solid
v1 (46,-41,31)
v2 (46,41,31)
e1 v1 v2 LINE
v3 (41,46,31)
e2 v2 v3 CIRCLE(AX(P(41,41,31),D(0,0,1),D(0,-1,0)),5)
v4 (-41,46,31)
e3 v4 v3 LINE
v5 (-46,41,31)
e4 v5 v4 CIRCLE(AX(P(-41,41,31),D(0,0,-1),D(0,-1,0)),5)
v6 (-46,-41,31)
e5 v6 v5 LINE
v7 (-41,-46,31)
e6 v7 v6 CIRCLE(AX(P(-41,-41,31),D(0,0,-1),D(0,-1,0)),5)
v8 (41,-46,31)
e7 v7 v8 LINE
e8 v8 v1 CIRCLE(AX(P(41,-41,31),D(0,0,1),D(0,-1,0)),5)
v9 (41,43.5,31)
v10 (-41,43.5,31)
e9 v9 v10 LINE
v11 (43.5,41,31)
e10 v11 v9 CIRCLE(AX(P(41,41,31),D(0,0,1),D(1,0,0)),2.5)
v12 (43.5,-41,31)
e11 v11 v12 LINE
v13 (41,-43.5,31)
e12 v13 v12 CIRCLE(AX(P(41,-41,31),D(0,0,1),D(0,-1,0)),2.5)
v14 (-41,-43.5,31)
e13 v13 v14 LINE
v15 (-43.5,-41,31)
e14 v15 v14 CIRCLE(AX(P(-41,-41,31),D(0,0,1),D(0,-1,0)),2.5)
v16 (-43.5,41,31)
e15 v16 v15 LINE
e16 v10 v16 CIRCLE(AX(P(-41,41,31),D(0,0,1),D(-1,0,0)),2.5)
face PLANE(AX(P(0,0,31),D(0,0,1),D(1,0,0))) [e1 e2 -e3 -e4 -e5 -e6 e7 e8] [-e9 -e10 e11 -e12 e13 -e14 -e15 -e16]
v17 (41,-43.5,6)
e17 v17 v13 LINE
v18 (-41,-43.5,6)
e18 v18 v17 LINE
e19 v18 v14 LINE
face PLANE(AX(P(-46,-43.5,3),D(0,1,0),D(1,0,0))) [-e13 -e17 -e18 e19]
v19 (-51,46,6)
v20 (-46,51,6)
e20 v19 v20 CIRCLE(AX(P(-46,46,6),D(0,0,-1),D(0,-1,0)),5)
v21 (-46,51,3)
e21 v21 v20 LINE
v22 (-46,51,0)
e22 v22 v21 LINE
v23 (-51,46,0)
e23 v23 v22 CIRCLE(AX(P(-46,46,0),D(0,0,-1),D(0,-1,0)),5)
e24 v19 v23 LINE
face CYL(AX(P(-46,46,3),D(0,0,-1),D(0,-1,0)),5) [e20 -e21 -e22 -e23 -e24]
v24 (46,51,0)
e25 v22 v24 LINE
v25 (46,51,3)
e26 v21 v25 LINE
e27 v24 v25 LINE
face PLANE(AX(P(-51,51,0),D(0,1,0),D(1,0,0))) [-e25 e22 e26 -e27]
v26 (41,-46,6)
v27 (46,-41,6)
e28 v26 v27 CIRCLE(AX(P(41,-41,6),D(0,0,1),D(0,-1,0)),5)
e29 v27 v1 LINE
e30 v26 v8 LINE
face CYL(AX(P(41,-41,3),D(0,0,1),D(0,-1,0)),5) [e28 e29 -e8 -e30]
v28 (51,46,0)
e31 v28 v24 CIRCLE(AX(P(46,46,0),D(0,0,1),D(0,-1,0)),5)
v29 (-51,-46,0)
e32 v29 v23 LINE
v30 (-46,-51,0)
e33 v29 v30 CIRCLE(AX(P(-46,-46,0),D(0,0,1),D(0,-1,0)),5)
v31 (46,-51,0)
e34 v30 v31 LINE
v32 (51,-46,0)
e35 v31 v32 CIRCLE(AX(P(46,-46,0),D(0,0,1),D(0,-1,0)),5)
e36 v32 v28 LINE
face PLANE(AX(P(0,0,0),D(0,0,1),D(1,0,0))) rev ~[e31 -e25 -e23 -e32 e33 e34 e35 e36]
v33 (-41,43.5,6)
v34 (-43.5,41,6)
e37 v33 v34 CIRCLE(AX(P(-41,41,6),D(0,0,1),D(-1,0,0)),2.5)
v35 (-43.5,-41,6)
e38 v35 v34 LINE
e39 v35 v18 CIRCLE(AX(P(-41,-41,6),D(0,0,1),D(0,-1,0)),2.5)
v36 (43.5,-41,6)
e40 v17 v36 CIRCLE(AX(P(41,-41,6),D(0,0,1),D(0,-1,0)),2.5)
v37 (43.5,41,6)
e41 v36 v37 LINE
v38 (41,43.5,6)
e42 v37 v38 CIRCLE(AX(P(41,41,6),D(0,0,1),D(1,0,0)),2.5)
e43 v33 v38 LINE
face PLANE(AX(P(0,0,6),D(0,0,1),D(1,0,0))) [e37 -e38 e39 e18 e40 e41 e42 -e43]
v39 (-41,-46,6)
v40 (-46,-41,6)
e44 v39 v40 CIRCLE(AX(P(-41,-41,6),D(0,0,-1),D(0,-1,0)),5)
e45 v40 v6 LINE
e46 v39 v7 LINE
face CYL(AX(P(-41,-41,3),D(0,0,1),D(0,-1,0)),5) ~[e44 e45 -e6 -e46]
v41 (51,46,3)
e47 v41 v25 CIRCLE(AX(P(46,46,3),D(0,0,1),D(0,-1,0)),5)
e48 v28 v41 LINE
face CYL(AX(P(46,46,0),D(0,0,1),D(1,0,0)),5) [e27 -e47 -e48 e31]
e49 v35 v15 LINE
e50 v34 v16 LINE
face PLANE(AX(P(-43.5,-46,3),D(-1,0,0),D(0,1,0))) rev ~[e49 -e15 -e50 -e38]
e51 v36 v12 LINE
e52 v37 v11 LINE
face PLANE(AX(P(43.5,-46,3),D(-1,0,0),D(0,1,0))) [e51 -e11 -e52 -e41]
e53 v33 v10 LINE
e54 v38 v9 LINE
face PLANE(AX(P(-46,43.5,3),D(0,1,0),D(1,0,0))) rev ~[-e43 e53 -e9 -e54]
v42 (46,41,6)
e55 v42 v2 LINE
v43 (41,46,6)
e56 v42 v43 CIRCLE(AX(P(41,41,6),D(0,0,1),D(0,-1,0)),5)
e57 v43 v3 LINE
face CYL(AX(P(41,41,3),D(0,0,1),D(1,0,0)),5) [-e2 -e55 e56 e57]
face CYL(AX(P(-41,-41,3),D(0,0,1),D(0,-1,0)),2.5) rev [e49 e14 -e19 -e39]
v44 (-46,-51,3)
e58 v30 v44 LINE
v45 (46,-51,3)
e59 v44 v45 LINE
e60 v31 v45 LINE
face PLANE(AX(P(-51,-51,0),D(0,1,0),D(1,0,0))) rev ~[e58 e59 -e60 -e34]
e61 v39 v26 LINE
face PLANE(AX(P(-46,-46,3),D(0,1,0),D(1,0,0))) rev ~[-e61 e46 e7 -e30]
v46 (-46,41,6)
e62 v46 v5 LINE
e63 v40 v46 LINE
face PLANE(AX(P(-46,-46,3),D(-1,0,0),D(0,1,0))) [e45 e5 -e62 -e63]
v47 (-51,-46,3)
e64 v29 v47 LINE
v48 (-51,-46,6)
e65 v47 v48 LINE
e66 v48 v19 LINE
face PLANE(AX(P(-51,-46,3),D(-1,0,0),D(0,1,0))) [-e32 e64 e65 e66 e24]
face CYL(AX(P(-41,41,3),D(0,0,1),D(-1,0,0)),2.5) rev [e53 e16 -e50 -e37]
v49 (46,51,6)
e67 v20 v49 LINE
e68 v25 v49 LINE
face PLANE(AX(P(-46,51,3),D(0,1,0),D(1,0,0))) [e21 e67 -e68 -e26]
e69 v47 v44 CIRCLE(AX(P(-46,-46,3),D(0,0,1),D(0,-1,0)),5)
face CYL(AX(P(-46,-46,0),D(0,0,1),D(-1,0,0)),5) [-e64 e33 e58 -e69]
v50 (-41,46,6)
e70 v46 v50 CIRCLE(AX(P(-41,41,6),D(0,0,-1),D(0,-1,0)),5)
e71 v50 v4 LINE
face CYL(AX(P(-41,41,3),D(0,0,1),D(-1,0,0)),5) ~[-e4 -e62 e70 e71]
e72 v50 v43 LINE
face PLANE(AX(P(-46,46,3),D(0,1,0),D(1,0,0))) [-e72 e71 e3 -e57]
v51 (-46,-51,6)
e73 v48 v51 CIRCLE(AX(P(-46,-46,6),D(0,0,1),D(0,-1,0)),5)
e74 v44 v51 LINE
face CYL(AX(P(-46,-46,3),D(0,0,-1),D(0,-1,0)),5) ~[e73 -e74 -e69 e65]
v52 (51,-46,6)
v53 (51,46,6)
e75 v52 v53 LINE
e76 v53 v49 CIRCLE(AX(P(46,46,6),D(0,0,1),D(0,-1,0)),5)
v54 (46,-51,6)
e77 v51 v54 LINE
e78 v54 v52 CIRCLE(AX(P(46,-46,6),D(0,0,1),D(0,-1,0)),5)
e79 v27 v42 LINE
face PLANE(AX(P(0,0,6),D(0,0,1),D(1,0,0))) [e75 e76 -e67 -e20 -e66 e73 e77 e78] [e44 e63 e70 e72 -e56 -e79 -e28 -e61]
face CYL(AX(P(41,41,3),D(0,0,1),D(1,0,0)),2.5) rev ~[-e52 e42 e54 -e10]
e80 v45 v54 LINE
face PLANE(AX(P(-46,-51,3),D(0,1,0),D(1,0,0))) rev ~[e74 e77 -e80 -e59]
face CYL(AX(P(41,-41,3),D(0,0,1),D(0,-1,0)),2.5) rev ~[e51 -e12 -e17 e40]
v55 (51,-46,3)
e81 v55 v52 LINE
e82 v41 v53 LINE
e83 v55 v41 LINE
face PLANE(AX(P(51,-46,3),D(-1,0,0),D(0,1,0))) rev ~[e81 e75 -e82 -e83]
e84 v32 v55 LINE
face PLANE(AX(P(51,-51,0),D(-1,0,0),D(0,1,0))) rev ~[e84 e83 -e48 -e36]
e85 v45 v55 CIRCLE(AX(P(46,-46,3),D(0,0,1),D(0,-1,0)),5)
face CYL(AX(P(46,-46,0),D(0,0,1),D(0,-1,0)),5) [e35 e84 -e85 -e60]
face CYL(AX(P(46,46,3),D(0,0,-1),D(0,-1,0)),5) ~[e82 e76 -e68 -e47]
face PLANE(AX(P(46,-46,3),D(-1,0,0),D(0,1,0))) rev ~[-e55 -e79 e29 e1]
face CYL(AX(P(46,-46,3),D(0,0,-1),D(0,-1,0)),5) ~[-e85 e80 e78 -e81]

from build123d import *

# Parameters (mm, degrees)
F0_W      = 102
F0_H      = 102
F1_DEPTH  = 3
F2_R      = 5
F3_R      = 5
F4_W      = 92
F4_H      = 92
F5_DEPTH  = 28
F6_R      = 5
F7_R      = 5
F8_T      = -2.5
F9_DEPTH  = 3
F10_DEPTH = 0.5


# Not quite as in the source:
# - an extrude ends at something that could not be found from the text; its depth is read off the source's solid


with BuildPart() as f1:
    # F0 (on Top) → F1 (new body)
    with BuildSketch(Plane.XY):
        Rectangle(F0_W, F0_H)
    extrude(amount=F1_DEPTH)

    # F2
    f2_edges = [f1.edges().sort_by_distance(p)[0] for p in [
        (-51, -51, 1.5),
        (51, -51, 1.5),
        (51, 51, 1.5),
    ]]
    fillet(f2_edges, radius=F2_R)

    # F3
    f3_edges = [f1.edges().sort_by_distance(p)[0] for p in [
        (-51, 51, 1.5),
    ]]
    fillet(f3_edges, radius=F3_R)

    # F4 (on face) → F5 (join)
    with BuildSketch(Plane.XY.offset(3)):
        Rectangle(F4_W, F4_H)
    extrude(amount=F5_DEPTH)

    # F6
    f6_edges = [f1.edges().sort_by_distance(p)[0] for p in [
        (-46, -46, 17),
    ]]
    fillet(f6_edges, radius=F6_R)

    # F7
    f7_edges = [f1.edges().sort_by_distance(p)[0] for p in [
        (46, -46, 17),
        (46, 46, 17),
        (-46, 46, 17),
    ]]
    fillet(f7_edges, radius=F7_R)

    # F8
    f8_openings = [f1.faces().sort_by_distance(p)[0] for p in [
        (0, 0, 31),
    ]]
    offset(amount=F8_T, openings=f8_openings, kind=Kind.INTERSECTION)

    # F9 (add): faces of the model
    f9_faces = [f1.faces().sort_by_distance(p)[0] for p in [
        (-47.4424978336, 0, 3),
        (0, 0, 2.5),
    ]]
    extrude(f9_faces, amount=F9_DEPTH)

    # F10 (add, through all): a face of the model
    f10_faces = [f1.faces().sort_by_distance(p)[0] for p in [
        (0, 0, 5.5),
    ]]
    extrude(f10_faces, amount=F10_DEPTH)


solid = f1.part
